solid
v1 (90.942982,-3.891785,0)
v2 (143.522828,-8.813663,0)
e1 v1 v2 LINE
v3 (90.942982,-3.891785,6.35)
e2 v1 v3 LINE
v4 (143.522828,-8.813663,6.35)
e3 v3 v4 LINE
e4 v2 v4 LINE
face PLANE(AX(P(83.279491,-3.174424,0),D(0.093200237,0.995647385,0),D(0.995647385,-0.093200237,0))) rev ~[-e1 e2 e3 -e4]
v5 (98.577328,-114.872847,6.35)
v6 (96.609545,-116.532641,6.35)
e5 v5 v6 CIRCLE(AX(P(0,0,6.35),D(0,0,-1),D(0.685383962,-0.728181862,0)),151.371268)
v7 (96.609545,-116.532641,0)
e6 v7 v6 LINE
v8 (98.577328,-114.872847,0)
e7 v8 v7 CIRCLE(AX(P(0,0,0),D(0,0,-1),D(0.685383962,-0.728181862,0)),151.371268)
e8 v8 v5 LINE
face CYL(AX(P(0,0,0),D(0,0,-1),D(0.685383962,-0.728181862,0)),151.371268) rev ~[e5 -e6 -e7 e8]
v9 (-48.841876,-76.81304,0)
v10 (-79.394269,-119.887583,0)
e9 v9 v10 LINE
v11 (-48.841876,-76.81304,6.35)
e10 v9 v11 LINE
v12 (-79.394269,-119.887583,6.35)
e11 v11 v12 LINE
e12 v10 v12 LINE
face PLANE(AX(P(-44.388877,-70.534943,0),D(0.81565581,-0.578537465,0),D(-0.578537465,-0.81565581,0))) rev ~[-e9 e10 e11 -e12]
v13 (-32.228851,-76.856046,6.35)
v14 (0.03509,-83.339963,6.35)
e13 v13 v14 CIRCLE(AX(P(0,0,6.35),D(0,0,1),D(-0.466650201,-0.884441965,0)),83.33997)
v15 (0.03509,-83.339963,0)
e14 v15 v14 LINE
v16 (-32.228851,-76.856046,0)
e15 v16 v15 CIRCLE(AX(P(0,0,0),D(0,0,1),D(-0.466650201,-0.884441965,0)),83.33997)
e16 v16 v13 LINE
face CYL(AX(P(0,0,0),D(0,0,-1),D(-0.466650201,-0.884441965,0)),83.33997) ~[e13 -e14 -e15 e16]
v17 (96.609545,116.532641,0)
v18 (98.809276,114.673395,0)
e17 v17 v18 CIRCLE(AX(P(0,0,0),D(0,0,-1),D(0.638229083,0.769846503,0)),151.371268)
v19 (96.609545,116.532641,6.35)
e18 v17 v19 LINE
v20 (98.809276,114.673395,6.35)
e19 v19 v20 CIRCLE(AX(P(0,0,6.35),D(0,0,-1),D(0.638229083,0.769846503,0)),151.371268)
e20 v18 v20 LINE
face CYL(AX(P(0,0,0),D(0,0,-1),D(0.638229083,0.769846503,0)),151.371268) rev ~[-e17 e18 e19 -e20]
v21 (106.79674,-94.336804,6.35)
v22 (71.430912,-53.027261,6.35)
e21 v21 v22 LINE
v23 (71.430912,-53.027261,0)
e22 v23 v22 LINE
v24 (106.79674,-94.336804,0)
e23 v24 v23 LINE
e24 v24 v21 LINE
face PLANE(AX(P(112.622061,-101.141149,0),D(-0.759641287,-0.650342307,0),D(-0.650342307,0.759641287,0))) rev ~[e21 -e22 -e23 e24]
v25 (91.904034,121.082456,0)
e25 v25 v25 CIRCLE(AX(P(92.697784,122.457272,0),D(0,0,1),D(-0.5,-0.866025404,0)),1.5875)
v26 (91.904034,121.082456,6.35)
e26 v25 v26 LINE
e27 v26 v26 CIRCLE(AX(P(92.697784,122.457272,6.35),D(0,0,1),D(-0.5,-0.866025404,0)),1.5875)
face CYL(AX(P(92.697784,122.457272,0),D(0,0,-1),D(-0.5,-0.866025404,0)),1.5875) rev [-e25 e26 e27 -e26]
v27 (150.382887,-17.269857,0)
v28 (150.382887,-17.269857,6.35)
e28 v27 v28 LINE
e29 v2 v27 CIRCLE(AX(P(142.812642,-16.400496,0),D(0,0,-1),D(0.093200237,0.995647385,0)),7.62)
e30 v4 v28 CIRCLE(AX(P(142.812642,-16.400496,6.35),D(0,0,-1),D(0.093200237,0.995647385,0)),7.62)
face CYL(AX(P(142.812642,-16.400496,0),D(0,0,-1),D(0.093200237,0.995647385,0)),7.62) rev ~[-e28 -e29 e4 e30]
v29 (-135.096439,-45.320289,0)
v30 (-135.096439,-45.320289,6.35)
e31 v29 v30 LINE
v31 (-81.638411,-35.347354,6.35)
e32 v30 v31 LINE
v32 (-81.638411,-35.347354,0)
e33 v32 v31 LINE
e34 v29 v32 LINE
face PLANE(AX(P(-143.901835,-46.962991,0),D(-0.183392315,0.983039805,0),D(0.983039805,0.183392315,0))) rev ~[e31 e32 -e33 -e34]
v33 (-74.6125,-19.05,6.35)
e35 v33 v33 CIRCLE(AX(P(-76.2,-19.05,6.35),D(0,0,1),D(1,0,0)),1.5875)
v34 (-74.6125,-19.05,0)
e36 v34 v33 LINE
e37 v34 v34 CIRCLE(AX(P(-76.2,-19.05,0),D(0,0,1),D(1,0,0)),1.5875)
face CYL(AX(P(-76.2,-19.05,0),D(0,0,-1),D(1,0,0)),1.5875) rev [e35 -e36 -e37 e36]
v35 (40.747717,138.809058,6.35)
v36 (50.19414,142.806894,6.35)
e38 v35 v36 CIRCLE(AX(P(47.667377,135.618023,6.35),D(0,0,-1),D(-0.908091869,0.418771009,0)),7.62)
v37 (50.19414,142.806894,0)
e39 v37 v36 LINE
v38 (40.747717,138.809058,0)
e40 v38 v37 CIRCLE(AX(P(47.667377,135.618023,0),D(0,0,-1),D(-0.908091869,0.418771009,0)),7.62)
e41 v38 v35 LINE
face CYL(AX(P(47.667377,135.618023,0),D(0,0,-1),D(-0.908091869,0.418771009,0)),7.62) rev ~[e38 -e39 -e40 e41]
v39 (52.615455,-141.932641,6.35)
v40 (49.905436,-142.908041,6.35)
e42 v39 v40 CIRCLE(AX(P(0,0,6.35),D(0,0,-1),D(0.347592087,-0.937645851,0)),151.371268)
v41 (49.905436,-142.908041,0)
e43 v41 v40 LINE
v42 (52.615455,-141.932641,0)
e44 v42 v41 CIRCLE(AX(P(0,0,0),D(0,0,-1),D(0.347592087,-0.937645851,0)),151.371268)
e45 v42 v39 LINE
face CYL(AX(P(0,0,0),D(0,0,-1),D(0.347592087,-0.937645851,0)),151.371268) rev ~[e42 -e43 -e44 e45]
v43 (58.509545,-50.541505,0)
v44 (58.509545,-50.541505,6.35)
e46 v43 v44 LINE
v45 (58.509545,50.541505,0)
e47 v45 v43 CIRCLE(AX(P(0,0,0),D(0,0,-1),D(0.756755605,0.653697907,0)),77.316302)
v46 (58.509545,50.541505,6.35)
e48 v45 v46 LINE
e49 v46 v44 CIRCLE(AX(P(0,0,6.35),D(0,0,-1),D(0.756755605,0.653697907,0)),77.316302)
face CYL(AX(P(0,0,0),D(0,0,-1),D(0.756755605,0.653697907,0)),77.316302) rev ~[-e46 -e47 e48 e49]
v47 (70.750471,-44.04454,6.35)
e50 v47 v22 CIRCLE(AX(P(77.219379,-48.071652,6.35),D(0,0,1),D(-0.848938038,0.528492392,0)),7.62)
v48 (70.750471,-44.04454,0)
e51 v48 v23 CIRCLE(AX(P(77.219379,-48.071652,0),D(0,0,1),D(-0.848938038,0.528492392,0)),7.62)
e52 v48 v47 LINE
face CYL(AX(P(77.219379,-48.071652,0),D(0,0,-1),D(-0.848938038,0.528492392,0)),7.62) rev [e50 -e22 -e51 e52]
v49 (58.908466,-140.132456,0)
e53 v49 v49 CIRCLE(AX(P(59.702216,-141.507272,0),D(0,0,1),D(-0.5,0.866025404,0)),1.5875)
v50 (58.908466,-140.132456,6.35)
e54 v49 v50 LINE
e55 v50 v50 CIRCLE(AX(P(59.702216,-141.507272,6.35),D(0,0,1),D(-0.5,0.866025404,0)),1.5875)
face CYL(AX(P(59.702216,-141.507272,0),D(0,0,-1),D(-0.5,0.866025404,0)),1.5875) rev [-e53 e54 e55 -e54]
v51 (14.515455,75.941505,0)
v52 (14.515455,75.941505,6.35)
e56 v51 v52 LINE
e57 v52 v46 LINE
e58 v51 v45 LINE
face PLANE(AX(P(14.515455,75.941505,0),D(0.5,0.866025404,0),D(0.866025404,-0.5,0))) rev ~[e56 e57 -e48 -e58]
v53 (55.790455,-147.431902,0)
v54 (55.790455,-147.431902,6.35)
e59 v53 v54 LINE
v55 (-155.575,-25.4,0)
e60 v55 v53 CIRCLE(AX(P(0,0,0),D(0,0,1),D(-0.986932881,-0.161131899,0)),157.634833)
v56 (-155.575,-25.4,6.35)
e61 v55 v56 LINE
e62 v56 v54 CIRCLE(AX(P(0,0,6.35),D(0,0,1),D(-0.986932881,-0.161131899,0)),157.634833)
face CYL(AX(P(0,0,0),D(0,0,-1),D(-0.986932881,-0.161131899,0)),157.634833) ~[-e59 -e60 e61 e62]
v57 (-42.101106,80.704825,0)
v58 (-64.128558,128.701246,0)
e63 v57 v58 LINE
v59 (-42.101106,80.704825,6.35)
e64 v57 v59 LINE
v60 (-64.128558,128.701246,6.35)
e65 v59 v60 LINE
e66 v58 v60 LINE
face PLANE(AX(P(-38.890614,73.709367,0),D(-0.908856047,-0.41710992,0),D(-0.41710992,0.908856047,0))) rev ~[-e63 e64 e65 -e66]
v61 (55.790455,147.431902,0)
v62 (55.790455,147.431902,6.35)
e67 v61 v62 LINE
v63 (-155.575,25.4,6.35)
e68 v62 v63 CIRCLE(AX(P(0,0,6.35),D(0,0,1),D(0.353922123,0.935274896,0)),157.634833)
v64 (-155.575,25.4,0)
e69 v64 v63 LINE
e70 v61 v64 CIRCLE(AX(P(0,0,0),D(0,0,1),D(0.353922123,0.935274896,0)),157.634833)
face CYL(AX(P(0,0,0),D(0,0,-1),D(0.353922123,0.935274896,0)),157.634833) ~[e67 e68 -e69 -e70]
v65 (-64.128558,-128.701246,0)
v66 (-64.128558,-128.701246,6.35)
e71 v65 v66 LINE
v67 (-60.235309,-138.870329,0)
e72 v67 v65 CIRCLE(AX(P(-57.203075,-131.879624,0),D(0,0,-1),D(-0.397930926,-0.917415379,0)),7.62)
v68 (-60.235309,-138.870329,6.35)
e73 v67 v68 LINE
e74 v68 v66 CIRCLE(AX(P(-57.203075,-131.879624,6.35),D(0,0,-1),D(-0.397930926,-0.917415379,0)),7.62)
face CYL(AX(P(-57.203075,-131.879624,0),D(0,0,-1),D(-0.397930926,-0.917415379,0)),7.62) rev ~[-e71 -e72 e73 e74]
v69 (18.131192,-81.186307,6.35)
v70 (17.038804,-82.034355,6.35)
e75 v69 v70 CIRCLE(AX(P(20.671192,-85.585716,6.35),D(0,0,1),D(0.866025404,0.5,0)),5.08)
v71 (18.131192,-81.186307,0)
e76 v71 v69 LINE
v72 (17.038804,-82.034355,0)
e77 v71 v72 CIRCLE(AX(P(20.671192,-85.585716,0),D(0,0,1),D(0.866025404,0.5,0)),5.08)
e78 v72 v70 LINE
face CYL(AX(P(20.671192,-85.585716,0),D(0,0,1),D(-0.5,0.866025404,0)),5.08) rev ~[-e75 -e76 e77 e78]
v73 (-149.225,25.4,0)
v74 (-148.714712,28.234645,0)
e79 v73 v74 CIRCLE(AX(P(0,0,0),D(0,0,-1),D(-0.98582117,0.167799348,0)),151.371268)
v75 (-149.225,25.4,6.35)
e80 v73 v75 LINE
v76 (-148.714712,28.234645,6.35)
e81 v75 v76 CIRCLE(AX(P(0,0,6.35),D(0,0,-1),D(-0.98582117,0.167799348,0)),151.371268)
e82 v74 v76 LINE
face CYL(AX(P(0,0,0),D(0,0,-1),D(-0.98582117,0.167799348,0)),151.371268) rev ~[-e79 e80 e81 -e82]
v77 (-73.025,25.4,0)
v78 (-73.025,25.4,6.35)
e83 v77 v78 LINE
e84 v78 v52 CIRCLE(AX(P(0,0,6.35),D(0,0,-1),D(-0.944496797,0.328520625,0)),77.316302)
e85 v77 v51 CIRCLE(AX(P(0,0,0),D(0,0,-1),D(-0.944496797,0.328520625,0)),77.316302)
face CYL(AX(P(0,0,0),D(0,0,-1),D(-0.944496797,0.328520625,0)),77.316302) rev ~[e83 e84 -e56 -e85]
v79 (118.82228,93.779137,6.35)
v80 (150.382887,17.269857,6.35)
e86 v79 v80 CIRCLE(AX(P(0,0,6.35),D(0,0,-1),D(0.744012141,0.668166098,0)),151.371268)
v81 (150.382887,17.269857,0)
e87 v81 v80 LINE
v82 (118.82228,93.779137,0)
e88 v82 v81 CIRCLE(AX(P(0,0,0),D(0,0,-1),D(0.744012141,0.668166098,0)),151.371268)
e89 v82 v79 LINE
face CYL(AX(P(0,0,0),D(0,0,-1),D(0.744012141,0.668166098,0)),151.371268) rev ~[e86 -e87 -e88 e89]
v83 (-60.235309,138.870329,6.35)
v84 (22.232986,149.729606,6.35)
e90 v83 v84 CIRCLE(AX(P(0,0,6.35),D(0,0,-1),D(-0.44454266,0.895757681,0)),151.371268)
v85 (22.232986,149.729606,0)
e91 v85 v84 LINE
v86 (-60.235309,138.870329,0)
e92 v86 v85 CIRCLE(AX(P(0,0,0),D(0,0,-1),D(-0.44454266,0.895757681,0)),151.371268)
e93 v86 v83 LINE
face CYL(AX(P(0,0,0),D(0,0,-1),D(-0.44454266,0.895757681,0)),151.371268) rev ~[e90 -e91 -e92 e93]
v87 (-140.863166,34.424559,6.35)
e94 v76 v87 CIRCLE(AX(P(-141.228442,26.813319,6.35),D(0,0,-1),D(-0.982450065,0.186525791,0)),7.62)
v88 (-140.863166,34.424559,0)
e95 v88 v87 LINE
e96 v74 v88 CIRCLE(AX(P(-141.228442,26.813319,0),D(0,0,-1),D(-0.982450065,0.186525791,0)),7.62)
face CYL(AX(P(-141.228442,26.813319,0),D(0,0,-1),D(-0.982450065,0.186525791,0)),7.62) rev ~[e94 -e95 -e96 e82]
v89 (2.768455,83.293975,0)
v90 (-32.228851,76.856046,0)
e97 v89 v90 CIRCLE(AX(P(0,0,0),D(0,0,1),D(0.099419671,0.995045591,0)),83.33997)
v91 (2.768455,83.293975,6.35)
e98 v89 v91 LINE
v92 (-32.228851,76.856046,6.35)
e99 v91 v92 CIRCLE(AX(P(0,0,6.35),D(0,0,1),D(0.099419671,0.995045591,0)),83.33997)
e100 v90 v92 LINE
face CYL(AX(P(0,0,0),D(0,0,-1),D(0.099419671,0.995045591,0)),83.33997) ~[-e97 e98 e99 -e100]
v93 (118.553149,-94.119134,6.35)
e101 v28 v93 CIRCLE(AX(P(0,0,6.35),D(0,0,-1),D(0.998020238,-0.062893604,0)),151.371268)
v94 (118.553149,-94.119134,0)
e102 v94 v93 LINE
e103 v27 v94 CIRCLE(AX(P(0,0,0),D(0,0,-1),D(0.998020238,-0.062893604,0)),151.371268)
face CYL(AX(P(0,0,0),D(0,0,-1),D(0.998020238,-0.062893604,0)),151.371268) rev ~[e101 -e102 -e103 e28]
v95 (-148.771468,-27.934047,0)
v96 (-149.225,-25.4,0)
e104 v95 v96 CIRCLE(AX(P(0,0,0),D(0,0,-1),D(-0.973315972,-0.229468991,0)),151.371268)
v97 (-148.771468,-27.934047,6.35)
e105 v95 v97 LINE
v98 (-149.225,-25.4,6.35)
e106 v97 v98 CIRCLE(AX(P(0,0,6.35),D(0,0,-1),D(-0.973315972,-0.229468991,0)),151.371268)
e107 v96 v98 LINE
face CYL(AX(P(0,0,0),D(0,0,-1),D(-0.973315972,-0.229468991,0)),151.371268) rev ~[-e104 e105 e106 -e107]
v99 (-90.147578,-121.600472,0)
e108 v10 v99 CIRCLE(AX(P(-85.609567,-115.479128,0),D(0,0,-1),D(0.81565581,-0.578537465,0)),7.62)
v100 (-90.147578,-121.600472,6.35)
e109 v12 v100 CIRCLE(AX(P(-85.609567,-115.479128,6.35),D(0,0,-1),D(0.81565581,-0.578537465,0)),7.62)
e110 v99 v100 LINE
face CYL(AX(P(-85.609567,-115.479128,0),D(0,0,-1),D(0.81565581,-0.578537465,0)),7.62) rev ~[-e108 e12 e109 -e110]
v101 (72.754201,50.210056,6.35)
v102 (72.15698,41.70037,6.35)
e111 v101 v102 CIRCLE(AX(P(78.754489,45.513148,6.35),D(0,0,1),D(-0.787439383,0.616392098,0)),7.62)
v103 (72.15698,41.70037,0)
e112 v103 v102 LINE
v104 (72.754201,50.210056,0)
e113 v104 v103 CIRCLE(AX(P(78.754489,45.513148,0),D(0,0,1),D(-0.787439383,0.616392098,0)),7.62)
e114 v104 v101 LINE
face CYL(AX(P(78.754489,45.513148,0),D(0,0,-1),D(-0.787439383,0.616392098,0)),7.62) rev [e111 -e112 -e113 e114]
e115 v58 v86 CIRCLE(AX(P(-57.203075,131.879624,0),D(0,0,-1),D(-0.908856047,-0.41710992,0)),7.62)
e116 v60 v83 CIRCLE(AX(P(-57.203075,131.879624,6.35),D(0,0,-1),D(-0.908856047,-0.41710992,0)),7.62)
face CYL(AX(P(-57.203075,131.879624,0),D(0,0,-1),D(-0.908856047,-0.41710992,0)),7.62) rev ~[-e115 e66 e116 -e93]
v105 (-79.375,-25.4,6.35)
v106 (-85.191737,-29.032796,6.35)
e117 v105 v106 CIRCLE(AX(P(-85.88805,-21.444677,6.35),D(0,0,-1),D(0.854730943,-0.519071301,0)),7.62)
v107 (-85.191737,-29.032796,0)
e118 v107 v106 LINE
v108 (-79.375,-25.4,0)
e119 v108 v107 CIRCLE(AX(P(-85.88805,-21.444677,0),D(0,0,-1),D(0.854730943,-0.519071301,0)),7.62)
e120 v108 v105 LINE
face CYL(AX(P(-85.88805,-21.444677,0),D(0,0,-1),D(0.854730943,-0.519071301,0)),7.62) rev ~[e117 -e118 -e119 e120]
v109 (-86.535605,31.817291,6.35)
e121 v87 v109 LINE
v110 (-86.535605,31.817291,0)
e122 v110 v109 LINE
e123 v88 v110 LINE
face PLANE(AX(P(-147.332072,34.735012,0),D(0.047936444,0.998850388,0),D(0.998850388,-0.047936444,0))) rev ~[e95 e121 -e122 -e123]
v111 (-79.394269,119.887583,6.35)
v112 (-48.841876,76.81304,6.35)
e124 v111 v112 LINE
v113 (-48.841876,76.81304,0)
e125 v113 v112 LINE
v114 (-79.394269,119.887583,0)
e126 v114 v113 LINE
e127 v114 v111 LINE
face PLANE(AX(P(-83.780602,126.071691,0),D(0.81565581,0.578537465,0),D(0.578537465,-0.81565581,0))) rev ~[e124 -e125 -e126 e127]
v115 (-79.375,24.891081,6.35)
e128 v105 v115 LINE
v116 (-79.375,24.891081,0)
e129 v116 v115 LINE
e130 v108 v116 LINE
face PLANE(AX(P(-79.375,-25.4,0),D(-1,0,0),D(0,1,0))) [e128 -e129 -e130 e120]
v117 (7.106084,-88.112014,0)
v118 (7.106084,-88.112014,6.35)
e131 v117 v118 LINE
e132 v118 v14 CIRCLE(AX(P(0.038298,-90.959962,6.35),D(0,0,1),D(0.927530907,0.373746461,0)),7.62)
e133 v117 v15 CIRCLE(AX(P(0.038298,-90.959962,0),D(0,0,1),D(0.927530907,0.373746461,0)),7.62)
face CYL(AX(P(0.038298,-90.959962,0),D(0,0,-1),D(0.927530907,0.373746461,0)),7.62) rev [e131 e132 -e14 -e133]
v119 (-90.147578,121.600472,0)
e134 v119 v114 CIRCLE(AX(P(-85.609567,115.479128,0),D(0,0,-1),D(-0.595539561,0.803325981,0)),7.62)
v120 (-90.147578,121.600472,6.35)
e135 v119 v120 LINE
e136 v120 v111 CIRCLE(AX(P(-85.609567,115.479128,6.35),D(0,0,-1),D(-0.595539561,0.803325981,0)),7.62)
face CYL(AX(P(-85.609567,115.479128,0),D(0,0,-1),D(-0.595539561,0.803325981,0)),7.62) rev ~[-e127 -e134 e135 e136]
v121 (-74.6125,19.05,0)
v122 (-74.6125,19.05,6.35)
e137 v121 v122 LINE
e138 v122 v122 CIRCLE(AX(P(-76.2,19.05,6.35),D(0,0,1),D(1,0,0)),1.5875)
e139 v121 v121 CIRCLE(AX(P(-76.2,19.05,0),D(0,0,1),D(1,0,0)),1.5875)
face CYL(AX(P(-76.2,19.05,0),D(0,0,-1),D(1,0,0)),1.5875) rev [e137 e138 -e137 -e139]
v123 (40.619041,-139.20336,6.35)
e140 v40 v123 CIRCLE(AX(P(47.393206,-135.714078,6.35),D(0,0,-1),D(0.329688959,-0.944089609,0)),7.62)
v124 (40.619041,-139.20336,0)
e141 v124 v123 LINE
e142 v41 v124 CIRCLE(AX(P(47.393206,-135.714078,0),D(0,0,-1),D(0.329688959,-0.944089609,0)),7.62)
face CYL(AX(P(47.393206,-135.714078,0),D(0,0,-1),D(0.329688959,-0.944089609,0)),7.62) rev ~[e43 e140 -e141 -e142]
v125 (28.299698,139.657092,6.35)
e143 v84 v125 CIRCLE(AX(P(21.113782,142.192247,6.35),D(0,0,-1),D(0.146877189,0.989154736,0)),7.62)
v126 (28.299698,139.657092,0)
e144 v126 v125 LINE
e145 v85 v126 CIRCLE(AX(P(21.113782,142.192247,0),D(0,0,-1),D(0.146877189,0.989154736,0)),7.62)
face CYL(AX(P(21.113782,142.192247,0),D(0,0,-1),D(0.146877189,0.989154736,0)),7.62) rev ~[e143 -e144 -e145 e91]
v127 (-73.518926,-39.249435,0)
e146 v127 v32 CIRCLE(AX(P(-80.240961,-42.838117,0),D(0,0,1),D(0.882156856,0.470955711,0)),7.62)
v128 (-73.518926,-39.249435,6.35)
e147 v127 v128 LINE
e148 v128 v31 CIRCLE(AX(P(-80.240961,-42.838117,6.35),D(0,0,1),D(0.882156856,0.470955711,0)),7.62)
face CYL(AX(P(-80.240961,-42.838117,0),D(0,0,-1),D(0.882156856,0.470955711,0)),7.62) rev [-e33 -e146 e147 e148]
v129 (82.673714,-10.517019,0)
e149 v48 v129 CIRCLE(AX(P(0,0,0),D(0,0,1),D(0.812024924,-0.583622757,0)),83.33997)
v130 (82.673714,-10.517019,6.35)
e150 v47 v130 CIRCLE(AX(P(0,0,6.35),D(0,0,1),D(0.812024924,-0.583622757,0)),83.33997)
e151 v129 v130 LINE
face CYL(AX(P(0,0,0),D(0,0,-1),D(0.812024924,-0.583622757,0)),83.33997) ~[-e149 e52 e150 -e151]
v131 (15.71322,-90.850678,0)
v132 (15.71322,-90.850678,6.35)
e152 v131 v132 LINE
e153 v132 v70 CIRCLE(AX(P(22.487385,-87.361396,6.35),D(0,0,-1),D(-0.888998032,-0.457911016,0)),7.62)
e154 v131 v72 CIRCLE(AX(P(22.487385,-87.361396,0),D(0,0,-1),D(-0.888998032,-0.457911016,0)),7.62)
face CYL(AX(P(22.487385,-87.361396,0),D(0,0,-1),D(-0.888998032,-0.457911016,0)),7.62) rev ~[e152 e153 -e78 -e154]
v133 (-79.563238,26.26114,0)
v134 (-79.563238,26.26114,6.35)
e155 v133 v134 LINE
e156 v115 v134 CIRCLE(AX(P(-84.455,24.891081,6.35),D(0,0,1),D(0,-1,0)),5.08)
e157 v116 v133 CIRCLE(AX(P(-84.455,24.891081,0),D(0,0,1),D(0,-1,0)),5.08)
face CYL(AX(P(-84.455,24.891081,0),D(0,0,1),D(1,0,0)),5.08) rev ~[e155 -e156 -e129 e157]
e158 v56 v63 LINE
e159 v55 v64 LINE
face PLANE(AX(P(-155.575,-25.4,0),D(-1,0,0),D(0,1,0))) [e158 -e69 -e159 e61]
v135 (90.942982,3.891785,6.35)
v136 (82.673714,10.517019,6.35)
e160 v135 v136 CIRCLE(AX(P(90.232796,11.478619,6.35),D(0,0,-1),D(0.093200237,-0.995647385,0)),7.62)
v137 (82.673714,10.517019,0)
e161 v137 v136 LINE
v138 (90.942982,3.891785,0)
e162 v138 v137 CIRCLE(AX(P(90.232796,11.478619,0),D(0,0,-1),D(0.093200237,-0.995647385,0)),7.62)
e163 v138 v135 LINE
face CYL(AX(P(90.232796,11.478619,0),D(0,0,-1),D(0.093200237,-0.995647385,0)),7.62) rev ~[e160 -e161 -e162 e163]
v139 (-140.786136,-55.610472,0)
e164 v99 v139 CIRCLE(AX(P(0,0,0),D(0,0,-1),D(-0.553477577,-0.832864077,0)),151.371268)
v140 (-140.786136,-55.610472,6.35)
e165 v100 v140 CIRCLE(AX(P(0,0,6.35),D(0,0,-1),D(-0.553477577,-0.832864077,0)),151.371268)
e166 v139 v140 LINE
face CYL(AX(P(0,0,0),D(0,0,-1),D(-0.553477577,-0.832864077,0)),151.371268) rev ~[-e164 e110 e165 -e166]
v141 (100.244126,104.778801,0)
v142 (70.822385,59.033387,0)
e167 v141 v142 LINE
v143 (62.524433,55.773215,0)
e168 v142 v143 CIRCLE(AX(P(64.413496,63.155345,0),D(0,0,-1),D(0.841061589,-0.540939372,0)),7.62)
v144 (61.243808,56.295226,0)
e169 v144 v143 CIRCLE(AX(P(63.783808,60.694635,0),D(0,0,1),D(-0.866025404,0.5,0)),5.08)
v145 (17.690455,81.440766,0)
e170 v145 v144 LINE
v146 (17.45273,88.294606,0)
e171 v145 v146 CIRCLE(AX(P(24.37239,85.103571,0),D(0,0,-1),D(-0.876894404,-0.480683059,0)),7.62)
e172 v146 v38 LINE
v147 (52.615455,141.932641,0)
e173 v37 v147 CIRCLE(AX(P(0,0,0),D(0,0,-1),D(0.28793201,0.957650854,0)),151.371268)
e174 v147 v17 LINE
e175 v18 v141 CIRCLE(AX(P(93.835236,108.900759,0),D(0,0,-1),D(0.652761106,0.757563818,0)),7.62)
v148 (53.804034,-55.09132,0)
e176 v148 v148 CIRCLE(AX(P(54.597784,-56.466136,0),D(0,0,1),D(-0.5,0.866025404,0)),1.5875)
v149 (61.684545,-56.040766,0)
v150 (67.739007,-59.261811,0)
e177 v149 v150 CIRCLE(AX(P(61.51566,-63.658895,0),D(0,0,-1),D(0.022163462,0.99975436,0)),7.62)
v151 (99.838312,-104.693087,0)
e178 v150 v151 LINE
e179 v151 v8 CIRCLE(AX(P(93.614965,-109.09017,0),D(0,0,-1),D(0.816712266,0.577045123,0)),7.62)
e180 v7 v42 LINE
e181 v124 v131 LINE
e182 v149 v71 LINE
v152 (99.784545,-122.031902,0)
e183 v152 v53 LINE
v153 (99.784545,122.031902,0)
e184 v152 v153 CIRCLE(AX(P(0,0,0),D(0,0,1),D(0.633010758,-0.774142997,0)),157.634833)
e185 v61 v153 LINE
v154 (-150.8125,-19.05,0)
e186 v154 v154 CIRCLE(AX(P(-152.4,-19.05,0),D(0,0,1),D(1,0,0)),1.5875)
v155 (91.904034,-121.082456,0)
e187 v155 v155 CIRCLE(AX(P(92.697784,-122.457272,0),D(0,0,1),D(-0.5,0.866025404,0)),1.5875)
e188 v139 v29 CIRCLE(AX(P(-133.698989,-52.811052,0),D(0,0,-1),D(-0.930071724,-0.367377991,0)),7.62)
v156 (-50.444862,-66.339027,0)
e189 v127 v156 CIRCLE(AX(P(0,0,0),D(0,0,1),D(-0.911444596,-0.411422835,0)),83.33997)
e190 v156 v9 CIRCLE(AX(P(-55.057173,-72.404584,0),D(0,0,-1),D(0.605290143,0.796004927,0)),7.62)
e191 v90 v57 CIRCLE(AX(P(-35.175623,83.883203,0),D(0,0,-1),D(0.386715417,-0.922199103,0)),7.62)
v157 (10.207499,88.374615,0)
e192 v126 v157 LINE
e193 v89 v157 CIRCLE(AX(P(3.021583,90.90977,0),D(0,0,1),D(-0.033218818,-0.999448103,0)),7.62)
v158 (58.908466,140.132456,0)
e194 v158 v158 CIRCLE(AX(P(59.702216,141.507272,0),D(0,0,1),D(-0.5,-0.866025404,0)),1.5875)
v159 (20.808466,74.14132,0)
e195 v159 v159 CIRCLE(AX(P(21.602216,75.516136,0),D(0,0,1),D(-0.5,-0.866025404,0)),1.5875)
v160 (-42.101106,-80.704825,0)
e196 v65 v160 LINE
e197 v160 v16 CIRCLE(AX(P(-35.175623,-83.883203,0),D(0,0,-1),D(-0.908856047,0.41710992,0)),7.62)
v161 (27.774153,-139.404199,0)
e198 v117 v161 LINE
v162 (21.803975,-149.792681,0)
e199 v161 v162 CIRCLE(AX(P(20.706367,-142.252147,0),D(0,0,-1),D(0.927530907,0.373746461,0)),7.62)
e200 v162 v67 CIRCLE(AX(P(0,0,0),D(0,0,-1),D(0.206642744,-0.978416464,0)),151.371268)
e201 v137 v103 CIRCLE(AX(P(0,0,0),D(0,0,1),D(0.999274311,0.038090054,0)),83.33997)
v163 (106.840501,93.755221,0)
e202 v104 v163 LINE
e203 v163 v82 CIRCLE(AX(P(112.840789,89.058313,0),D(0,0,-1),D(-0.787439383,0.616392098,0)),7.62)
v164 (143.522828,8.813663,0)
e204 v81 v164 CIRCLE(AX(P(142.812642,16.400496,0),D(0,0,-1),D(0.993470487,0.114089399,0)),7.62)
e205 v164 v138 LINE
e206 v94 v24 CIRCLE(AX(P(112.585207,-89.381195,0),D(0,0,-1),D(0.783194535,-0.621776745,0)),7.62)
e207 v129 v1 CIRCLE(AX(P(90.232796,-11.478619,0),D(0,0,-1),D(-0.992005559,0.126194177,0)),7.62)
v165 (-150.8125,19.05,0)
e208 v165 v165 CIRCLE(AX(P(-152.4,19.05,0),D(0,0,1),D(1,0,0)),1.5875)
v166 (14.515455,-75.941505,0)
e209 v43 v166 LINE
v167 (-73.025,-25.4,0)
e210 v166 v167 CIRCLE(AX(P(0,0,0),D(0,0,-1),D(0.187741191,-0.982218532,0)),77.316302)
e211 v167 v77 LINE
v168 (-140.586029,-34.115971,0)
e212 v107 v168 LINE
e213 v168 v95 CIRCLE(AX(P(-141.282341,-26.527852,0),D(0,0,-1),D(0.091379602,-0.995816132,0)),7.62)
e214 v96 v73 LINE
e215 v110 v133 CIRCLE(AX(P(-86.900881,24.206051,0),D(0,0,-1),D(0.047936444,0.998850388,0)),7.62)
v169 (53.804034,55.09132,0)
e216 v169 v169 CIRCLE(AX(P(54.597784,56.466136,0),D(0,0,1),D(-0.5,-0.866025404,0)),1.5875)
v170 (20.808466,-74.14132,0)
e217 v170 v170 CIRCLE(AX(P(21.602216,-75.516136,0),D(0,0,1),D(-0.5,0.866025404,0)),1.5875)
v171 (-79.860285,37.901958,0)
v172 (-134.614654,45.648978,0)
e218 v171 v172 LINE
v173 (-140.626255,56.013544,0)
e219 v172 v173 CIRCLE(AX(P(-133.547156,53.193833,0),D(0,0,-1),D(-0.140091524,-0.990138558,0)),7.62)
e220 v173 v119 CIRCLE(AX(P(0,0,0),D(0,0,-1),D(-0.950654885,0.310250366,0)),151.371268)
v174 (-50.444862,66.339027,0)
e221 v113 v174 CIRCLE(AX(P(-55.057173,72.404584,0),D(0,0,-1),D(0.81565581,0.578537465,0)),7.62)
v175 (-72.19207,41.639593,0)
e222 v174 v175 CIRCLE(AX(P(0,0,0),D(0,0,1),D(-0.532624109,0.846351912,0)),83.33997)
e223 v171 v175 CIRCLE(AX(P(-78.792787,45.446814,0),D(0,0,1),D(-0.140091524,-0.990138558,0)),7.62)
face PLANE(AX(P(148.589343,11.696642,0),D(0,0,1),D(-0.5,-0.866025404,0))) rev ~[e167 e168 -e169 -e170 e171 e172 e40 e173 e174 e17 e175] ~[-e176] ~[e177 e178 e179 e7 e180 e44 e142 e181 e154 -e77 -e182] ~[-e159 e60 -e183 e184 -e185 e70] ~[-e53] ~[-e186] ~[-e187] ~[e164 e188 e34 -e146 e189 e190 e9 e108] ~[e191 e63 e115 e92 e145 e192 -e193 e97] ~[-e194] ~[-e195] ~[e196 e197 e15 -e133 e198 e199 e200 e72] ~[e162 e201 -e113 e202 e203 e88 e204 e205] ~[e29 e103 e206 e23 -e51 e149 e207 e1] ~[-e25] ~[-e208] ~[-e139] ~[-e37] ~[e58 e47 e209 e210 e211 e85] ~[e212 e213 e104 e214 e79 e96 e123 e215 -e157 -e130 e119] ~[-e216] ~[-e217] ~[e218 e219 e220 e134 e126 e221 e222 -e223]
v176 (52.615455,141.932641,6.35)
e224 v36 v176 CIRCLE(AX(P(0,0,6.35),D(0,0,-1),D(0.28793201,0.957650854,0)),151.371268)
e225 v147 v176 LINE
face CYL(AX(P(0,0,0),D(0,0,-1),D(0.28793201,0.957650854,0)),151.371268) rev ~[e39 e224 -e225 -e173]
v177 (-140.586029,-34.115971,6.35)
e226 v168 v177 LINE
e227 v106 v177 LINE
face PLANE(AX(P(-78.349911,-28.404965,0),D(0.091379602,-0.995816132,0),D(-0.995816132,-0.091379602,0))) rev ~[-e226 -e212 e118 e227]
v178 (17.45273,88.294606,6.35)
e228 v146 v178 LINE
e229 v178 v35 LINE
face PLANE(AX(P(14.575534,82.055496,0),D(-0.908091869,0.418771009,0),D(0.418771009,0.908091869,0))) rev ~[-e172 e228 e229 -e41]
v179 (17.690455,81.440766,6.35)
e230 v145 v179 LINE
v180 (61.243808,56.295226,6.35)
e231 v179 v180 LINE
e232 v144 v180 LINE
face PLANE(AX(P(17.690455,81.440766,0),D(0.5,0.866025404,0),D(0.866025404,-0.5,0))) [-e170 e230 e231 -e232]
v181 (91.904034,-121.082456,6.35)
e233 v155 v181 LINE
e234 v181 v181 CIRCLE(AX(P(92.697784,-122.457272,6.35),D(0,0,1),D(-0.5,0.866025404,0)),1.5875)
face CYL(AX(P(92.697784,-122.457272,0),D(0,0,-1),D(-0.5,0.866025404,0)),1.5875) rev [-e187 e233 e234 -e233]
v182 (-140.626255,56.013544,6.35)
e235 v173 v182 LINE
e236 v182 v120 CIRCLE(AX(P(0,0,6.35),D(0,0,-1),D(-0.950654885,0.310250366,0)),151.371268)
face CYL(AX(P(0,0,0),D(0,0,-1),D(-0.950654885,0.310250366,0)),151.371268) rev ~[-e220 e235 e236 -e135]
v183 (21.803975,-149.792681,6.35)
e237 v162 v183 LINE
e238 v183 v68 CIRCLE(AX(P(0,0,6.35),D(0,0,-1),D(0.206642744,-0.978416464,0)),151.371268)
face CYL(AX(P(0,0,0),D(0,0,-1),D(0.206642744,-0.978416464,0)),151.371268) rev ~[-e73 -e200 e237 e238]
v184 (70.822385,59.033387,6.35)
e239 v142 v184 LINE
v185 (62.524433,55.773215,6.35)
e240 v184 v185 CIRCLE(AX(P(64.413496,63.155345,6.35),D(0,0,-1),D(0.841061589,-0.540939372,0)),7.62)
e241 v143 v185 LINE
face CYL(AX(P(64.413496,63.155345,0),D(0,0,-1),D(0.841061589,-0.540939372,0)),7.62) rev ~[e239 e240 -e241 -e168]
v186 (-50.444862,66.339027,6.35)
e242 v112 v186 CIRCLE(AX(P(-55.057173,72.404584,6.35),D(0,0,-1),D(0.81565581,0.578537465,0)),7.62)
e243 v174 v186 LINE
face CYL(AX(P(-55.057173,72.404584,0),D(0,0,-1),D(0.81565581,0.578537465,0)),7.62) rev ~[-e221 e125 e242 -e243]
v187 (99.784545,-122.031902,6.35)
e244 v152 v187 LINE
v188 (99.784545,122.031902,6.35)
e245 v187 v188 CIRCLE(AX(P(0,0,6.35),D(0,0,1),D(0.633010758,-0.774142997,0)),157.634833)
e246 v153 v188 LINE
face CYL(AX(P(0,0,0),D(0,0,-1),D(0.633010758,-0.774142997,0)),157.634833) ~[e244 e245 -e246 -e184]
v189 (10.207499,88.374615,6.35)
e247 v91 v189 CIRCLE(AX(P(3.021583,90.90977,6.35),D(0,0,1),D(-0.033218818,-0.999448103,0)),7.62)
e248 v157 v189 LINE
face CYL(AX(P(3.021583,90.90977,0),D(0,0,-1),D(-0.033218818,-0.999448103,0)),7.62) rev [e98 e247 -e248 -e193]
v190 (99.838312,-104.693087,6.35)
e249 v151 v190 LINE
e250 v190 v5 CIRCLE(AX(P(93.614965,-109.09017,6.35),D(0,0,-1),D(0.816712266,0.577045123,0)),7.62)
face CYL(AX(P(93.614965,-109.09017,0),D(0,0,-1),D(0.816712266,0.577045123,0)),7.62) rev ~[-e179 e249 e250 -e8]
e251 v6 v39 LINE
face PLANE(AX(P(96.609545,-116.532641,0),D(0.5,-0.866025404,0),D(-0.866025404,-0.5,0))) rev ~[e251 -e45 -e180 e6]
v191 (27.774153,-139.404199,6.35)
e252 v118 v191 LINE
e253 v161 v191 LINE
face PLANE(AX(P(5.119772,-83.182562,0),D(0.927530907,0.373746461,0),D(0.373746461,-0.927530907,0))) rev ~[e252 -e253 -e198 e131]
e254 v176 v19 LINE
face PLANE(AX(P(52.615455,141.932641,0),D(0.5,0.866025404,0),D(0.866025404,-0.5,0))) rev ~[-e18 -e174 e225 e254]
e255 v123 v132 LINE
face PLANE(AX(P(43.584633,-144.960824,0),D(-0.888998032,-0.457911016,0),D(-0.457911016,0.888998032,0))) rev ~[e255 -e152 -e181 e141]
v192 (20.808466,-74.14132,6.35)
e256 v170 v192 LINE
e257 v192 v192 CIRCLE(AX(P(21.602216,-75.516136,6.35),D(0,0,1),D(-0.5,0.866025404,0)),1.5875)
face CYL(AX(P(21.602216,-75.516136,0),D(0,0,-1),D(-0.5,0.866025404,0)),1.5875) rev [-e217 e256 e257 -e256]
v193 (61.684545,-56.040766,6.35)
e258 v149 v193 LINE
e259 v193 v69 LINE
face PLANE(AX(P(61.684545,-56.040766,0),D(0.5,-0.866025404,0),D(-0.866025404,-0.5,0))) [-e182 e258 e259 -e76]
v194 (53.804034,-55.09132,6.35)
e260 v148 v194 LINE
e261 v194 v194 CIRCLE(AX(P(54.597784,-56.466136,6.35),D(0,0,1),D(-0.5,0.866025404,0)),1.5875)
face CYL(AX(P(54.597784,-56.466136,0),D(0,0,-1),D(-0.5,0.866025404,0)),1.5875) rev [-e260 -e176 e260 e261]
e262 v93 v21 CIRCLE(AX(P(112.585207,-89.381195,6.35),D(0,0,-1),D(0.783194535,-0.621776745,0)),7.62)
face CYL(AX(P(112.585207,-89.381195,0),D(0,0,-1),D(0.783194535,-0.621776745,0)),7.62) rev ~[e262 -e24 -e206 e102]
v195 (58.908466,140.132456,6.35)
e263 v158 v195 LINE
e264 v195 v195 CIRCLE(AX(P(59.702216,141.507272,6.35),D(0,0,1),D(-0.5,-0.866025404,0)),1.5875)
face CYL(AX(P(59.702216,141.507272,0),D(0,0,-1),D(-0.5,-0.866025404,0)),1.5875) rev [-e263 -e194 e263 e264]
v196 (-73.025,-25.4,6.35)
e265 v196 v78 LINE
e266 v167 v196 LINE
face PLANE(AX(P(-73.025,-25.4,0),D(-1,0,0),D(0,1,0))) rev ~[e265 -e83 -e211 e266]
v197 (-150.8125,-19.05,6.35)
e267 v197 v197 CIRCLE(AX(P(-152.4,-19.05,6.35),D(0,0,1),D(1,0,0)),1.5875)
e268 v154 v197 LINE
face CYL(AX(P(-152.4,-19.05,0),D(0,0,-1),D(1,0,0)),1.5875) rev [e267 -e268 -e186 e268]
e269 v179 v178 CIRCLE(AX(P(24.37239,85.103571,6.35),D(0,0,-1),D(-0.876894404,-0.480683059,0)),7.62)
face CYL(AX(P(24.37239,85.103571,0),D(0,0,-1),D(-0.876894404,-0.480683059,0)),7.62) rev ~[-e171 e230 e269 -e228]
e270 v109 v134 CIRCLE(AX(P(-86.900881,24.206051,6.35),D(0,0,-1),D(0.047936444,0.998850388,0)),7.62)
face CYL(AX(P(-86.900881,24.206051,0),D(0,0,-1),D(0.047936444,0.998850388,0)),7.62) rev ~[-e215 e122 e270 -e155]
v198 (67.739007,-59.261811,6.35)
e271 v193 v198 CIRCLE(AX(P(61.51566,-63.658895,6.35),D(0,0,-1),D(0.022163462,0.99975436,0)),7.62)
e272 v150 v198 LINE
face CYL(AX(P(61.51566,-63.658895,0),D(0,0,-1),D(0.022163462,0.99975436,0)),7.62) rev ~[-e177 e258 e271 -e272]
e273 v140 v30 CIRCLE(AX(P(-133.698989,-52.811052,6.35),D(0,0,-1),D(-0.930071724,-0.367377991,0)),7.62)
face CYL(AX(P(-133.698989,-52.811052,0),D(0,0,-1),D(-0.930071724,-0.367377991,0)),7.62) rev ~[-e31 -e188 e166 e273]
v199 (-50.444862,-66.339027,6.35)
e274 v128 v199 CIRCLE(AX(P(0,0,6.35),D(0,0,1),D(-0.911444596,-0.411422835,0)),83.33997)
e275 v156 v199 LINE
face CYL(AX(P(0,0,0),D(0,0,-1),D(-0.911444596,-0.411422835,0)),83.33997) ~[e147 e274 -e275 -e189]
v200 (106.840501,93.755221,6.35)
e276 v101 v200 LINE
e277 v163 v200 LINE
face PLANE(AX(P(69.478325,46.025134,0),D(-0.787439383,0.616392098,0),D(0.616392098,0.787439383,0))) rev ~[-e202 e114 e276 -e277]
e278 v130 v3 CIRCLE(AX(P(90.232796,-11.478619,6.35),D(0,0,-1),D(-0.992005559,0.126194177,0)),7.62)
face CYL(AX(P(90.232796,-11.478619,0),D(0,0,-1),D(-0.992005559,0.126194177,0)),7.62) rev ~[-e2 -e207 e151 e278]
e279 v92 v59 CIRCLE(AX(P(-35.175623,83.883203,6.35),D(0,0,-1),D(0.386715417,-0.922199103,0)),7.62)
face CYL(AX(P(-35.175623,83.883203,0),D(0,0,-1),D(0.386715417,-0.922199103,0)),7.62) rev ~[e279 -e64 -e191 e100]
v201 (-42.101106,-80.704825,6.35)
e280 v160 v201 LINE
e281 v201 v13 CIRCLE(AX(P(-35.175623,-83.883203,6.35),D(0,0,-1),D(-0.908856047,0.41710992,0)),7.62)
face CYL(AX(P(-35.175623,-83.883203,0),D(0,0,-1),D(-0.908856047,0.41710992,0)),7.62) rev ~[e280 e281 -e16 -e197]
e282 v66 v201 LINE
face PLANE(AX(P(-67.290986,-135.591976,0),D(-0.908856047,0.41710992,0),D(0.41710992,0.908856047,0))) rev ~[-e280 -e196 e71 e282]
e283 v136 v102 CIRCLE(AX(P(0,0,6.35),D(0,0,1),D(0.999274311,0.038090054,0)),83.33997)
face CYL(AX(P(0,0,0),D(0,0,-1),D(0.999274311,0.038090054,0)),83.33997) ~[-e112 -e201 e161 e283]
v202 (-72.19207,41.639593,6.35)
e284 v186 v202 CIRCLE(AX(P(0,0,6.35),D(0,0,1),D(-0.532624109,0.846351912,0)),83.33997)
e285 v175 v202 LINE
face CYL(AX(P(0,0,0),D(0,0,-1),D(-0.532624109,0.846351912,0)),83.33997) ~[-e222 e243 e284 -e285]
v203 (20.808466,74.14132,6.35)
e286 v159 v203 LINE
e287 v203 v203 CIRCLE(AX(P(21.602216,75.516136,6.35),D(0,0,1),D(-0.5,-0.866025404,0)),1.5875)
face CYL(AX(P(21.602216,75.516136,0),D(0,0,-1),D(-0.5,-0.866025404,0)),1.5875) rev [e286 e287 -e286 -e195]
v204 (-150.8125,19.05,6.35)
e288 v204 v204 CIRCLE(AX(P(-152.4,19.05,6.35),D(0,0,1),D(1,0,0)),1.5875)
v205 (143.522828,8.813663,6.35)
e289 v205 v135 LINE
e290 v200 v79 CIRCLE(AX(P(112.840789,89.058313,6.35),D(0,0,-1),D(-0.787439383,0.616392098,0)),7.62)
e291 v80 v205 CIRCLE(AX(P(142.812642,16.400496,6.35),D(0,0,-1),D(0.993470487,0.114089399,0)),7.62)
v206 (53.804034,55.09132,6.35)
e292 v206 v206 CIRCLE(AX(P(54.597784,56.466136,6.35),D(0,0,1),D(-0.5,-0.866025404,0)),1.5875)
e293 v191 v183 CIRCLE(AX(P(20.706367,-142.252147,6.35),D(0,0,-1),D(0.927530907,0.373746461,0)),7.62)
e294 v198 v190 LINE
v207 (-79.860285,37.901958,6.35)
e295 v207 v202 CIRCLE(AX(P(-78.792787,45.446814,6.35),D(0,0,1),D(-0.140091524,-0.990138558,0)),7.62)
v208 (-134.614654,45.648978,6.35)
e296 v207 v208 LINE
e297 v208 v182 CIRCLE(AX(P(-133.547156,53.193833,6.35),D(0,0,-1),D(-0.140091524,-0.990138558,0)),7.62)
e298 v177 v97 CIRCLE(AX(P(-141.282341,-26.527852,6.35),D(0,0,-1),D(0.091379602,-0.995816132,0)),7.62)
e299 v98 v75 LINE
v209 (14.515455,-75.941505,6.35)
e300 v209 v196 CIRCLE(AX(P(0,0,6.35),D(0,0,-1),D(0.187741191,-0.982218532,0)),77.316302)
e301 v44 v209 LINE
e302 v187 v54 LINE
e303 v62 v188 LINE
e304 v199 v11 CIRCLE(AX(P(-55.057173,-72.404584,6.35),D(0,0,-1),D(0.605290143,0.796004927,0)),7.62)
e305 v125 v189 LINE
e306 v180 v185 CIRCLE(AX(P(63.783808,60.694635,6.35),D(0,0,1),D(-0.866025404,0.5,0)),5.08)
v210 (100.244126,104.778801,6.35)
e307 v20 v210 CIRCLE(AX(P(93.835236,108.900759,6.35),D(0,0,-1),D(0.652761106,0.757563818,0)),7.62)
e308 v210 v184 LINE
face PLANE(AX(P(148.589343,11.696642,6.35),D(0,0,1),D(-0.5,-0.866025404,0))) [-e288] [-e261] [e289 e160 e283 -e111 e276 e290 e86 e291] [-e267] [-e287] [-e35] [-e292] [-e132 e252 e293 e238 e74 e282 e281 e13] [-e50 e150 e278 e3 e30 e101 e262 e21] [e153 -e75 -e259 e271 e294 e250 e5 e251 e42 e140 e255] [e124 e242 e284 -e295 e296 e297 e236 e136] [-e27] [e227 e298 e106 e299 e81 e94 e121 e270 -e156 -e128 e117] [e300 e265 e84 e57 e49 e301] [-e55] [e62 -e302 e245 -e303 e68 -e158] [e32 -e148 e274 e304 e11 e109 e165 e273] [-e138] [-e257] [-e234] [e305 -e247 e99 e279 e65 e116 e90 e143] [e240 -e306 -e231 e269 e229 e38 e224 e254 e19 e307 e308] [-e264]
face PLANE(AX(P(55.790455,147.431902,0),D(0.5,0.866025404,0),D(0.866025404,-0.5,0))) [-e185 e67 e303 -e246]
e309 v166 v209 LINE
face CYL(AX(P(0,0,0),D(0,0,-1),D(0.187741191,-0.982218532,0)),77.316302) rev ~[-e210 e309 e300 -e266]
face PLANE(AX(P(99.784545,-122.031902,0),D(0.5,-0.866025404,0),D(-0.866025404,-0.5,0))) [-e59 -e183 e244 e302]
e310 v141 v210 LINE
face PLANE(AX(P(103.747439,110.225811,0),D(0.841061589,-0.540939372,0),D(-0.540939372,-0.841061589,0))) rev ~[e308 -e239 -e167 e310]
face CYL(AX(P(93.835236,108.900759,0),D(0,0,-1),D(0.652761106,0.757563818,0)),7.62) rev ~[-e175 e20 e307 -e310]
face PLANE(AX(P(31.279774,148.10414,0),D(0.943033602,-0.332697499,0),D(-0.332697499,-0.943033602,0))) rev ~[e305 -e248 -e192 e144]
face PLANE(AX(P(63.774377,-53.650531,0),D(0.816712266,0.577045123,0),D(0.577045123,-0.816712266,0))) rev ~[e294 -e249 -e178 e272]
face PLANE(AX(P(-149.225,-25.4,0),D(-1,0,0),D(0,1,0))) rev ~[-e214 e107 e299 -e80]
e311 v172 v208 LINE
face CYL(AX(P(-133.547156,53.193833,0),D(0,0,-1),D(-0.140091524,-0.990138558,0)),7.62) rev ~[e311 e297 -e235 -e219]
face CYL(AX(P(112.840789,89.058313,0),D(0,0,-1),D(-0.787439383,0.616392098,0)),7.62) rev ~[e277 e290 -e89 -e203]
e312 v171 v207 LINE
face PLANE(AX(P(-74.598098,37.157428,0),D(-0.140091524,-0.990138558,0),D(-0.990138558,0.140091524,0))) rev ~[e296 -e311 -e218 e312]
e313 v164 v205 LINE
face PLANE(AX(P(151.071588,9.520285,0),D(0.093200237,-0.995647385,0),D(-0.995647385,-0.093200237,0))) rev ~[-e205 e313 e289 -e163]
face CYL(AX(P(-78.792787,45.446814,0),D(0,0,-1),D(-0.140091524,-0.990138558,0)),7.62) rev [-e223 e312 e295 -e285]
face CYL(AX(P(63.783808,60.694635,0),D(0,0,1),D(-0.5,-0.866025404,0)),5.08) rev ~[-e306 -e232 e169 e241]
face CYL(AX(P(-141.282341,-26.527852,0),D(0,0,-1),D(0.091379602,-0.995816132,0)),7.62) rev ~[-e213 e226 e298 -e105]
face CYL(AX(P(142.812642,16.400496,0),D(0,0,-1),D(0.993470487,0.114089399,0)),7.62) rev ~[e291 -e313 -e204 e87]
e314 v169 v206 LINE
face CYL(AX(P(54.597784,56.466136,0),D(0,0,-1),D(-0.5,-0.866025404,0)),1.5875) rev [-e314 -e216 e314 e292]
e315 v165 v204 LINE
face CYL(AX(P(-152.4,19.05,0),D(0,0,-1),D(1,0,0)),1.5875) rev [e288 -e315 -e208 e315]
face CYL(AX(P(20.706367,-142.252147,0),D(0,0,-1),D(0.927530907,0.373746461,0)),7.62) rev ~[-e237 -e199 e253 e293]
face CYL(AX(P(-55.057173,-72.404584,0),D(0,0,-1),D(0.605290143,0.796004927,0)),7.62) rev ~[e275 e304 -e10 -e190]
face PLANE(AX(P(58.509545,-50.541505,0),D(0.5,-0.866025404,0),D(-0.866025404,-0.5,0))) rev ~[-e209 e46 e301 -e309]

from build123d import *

# Parameters (mm, degrees)
F0_W        = 6.35
F0_H        = 50.8
F0_R        = 1.5875
F1_DEPTH    = 6.35
F4_DEPTH    = 6.35
F5_T1_DEPTH = 6.35
F6_R        = 5.08
F7_COUNT    = 3


# Not quite as in the source:
# - a fillet or chamfer that OpenCascade refuses, or shapes differently, is made with other operations: its cross-section is extruded or revolved along the edge and cut away or added
# - a feature of the source that left no trace in its solid (it failed there, or was rolled back) is left out


with BuildPart() as f1:
    # F0 (on Top) → F1 (new body)
    with BuildSketch(Plane.XY):
        with Locations((-76.2, 0)):
            Rectangle(F0_W, F0_H)
        with Locations((-76.2, -19.05)):
            Circle(F0_R, mode=Mode.SUBTRACT)
        with Locations((-76.2, 19.05)):
            Circle(F0_R, mode=Mode.SUBTRACT)
    extrude(amount=F1_DEPTH)



with BuildPart() as f1b:
    # F0 (on Top) → F1, piece 2 (new body)
    with BuildSketch(Plane.XY):
        with Locations((-152.4, 0)):
            Rectangle(F0_W, F0_H)
        with Locations((-152.4, -19.05)):
            Circle(F0_R, mode=Mode.SUBTRACT)
        with Locations((-152.4, 19.05)):
            Circle(F0_R, mode=Mode.SUBTRACT)
    extrude(amount=F1_DEPTH)


with BuildPart() as f1_1:
    add(f1.part)

    add(f1b.part)  # F4 merges F1b
    # F3 (on Top) → F4 (join)
    with BuildSketch(Plane.XY):
        with BuildLine():
            ThreePointArc((31.2797741547, 148.1041402319), (37.4651836805, 146.6615854162), (43.584633363, 144.9608235339))
            ThreePointArc((43.584633363, 144.9608235339), (48.1238684074, 143.5177825724), (52.6154547439, 141.9326408797))
            Line((52.6154547439, 141.9326408797), (55.7904547439, 147.4319021938))
            ThreePointArc((55.7904547439, 147.4319021938), (-78.8174165794, 136.5157700368), (-155.575, 25.4))
            Line((-155.575, 25.4), (-149.225, 25.4))
            ThreePointArc((-149.225, 25.4), (-148.3519798062, 30.0823987171), (-147.3320724153, 34.7350120599))
            ThreePointArc((-147.3320724153, 34.7350120599), (-145.7452505699, 40.8849918834), (-143.9018349238, 46.9629910733))
            ThreePointArc((-143.9018349238, 46.9629910733), (-120.5170928624, 91.5908890283), (-83.7806024253, 126.0716910423))
            ThreePointArc((-83.7806024253, 126.0716910423), (-75.6856337507, 131.0913630593), (-67.2909859281, 135.5919755658))
            ThreePointArc((-67.2909859281, 135.5919755658), (-19.0614902225, 150.1663085232), (31.2797741547, 148.1041402319))
        make_face()
        with BuildLine():
            ThreePointArc((8.2856324479, 82.9270698864), (11.4388872215, 82.551211282), (14.5755338083, 82.0554960938))
            Line((14.5755338083, 82.0554960938), (43.584633363, 144.9608235339))
            ThreePointArc((43.584633363, 144.9608235339), (37.4651836805, 146.6615854162), (31.2797741547, 148.1041402319))
            Line((31.2797741547, 148.1041402319), (8.2856324479, 82.9270698864))
        make_face()
        with BuildLine():
            ThreePointArc((-44.3888773768, 70.534943044), (-41.6699850762, 72.1745313026), (-38.8906138422, 73.7093669758))
            Line((-38.8906138422, 73.7093669758), (-67.2909859281, 135.5919755658))
            ThreePointArc((-67.2909859281, 135.5919755658), (-75.6856337507, 131.0913630593), (-83.7806024253, 126.0716910423))
            Line((-83.7806024253, 126.0716910423), (-44.3888773768, 70.534943044))
        make_face()
        with BuildLine():
            Line((-147.3320724153, 34.7350120599), (-77.2106727023, 31.3697728054))
            ThreePointArc((-77.2106727023, 31.3697728054), (-75.9595282254, 34.2884921917), (-74.5980976675, 37.1574279168))
            Line((-74.5980976675, 37.1574279168), (-143.9018349238, 46.9629910733))
            ThreePointArc((-143.9018349238, 46.9629910733), (-145.7452505699, 40.8849918834), (-147.3320724153, 34.7350120599))
        make_face()
        with BuildLine():
            ThreePointArc((-73.025, 25.4), (-38.6581512265, 66.957882051), (14.5154547439, 75.9415051114))
            Line((14.5154547439, 75.9415051114), (17.6904547439, 81.4407664254))
            ThreePointArc((17.6904547439, 81.4407664254), (16.1359219586, 81.762966235), (14.5755338083, 82.0554960938))
            ThreePointArc((14.5755338083, 82.0554960938), (11.4388872215, 82.551211282), (8.2856324479, 82.9270698864))
            ThreePointArc((8.2856324479, 82.9270698864), (-15.9814809475, 81.7932936843), (-38.8906138422, 73.7093669758))
            ThreePointArc((-38.8906138422, 73.7093669758), (-41.6699850762, 72.1745313026), (-44.3888773768, 70.534943044))
            ThreePointArc((-44.3888773768, 70.534943044), (-61.7898833675, 55.9246004763), (-74.5980976675, 37.1574279168))
            ThreePointArc((-74.5980976675, 37.1574279168), (-75.9595282254, 34.2884921917), (-77.2106727023, 31.3697728054))
            ThreePointArc((-77.2106727023, 31.3697728054), (-78.3497145543, 28.4055074635), (-79.375, 25.4))
            Line((-79.375, 25.4), (-73.025, 25.4))
        make_face()
    extrude(amount=F4_DEPTH)

    # F5: fillet of radius 7.62 on 12 edges, made by hand

    # F5_s2 → F5_t1 (join)
    with BuildSketch(Plane.XY):
        with BuildLine():
            ThreePointArc((-90.1475782146, 121.6004719031), (-84.410893045, 123.0042579182), (-79.3942694829, 119.8875834167))
            Line((-79.3942694829, 119.8875834167), (-83.7806024253, 126.0716910423))
            ThreePointArc((-83.7806024253, 126.0716910423), (-86.9928212861, 123.8769941098), (-90.1475782146, 121.6004719031))
        make_face()
        with BuildLine():
            ThreePointArc((-134.6146538369, 45.648977655), (-140.1386521152, 49.370669263), (-140.6262545751, 56.0135443368))
            ThreePointArc((-140.6262545751, 56.0135443368), (-142.3359988094, 51.5143093511), (-143.9018349238, 46.9629910733))
            Line((-143.9018349238, 46.9629910733), (-134.6146538369, 45.648977655))
        make_face()
        with BuildLine():
            ThreePointArc((-79.8602845165, 37.90195783), (-75.4541334055, 38.5971573414), (-72.1920699233, 41.6395925194))
            ThreePointArc((-72.1920699233, 41.6395925194), (-73.4292909895, 39.4168726535), (-74.5980976675, 37.1574279168))
            Line((-74.5980976675, 37.1574279168), (-79.8602845165, 37.90195783))
        make_face()
        with BuildLine():
            ThreePointArc((-48.8418760227, 76.8130398608), (-47.5248753854, 71.2518102655), (-50.4448624125, 66.3390268333))
            ThreePointArc((-50.4448624125, 66.3390268333), (-47.463259252, 68.50393891), (-44.3888773768, 70.534943044))
            Line((-44.3888773768, 70.534943044), (-48.8418760227, 76.8130398608))
        make_face()
        with BuildLine():
            ThreePointArc((-32.2288512937, 76.8560457563), (-37.9434400628, 76.7836545282), (-42.10110585, 80.7048253346))
            Line((-42.10110585, 80.7048253346), (-38.8906138422, 73.7093669758))
            ThreePointArc((-38.8906138422, 73.7093669758), (-35.5945217294, 75.3563577136), (-32.2288512937, 76.8560457563))
        make_face()
        with BuildLine():
            ThreePointArc((2.7684553264, 83.2939750529), (7.3191534676, 84.6172910948), (10.2074987686, 88.3746146557))
            Line((10.2074987686, 88.3746146557), (8.2856324479, 82.9270698864))
            ThreePointArc((8.2856324479, 82.9270698864), (5.5300876106, 83.1562911392), (2.7684553264, 83.2939750529))
        make_face()
        with BuildLine():
            ThreePointArc((22.2329863038, 149.7296061072), (27.6412349333, 146.1237556106), (28.2996981684, 139.6570920806))
            Line((28.2996981684, 139.6570920806), (31.2797741547, 148.1041402319))
            ThreePointArc((31.2797741547, 148.1041402319), (26.7687208847, 148.9855570423), (22.2329863038, 149.7296061072))
        make_face()
        with BuildLine():
            ThreePointArc((-64.1285580958, 128.7012459955), (-64.3193656083, 134.6041066922), (-60.2353086729, 138.870328775))
            ThreePointArc((-60.2353086729, 138.870328775), (-63.7842132005, 137.2764902356), (-67.2909859281, 135.5919755658))
            Line((-67.2909859281, 135.5919755658), (-64.1285580958, 128.7012459955))
        make_face()
        with BuildLine():
            ThreePointArc((-148.71471153, 28.234645377), (-145.9460574533, 32.7973396391), (-140.8631663364, 34.4245588066))
            Line((-140.8631663364, 34.4245588066), (-147.3320724153, 34.7350120599))
            ThreePointArc((-147.3320724153, 34.7350120599), (-148.0590701809, 31.4924175344), (-148.71471153, 28.234645377))
        make_face()
        with BuildLine():
            ThreePointArc((-86.5356054314, 31.8172913917), (-81.8153136869, 29.8806795078), (-79.375, 25.4))
            ThreePointArc((-79.375, 25.4), (-78.3497145543, 28.4055074635), (-77.2106727023, 31.3697728054))
            Line((-77.2106727023, 31.3697728054), (-86.5356054314, 31.8172913917))
        make_face()
        with BuildLine():
            ThreePointArc((40.7477165489, 138.8090579205), (44.6975181874, 142.6354540642), (50.194139768, 142.8068939441))
            ThreePointArc((50.194139768, 142.8068939441), (46.901752906, 143.9218058508), (43.584633363, 144.9608235339))
            Line((43.584633363, 144.9608235339), (40.7477165489, 138.8090579205))
        make_face()
        with BuildLine():
            ThreePointArc((17.6904547439, 81.4407664254), (16.7569695627, 84.8394313215), (17.4527300656, 88.294606423))
            Line((17.4527300656, 88.294606423), (14.5755338083, 82.0554960938))
            ThreePointArc((14.5755338083, 82.0554960938), (16.1359219586, 81.762966235), (17.6904547439, 81.4407664254))
        make_face()
    extrude(amount=F5_T1_DEPTH)

    # F6
    f6_edges = [f1_1.edges().sort_by_distance(p)[0] for p in [
        (-79.375, 25.4, 3.175),
    ]]
    fillet(f6_edges, radius=F6_R)

    # F7: F1 ×3 about axis
    f7_axis = Axis((0, 0, 0), (0, 0, 1))


with BuildPart() as f1_2:
    add(f1_1.part)
    for i in range(1, F7_COUNT):
        add(f1_1.part.rotate(f7_axis, i * 360 / F7_COUNT))


solid = f1_2.part
